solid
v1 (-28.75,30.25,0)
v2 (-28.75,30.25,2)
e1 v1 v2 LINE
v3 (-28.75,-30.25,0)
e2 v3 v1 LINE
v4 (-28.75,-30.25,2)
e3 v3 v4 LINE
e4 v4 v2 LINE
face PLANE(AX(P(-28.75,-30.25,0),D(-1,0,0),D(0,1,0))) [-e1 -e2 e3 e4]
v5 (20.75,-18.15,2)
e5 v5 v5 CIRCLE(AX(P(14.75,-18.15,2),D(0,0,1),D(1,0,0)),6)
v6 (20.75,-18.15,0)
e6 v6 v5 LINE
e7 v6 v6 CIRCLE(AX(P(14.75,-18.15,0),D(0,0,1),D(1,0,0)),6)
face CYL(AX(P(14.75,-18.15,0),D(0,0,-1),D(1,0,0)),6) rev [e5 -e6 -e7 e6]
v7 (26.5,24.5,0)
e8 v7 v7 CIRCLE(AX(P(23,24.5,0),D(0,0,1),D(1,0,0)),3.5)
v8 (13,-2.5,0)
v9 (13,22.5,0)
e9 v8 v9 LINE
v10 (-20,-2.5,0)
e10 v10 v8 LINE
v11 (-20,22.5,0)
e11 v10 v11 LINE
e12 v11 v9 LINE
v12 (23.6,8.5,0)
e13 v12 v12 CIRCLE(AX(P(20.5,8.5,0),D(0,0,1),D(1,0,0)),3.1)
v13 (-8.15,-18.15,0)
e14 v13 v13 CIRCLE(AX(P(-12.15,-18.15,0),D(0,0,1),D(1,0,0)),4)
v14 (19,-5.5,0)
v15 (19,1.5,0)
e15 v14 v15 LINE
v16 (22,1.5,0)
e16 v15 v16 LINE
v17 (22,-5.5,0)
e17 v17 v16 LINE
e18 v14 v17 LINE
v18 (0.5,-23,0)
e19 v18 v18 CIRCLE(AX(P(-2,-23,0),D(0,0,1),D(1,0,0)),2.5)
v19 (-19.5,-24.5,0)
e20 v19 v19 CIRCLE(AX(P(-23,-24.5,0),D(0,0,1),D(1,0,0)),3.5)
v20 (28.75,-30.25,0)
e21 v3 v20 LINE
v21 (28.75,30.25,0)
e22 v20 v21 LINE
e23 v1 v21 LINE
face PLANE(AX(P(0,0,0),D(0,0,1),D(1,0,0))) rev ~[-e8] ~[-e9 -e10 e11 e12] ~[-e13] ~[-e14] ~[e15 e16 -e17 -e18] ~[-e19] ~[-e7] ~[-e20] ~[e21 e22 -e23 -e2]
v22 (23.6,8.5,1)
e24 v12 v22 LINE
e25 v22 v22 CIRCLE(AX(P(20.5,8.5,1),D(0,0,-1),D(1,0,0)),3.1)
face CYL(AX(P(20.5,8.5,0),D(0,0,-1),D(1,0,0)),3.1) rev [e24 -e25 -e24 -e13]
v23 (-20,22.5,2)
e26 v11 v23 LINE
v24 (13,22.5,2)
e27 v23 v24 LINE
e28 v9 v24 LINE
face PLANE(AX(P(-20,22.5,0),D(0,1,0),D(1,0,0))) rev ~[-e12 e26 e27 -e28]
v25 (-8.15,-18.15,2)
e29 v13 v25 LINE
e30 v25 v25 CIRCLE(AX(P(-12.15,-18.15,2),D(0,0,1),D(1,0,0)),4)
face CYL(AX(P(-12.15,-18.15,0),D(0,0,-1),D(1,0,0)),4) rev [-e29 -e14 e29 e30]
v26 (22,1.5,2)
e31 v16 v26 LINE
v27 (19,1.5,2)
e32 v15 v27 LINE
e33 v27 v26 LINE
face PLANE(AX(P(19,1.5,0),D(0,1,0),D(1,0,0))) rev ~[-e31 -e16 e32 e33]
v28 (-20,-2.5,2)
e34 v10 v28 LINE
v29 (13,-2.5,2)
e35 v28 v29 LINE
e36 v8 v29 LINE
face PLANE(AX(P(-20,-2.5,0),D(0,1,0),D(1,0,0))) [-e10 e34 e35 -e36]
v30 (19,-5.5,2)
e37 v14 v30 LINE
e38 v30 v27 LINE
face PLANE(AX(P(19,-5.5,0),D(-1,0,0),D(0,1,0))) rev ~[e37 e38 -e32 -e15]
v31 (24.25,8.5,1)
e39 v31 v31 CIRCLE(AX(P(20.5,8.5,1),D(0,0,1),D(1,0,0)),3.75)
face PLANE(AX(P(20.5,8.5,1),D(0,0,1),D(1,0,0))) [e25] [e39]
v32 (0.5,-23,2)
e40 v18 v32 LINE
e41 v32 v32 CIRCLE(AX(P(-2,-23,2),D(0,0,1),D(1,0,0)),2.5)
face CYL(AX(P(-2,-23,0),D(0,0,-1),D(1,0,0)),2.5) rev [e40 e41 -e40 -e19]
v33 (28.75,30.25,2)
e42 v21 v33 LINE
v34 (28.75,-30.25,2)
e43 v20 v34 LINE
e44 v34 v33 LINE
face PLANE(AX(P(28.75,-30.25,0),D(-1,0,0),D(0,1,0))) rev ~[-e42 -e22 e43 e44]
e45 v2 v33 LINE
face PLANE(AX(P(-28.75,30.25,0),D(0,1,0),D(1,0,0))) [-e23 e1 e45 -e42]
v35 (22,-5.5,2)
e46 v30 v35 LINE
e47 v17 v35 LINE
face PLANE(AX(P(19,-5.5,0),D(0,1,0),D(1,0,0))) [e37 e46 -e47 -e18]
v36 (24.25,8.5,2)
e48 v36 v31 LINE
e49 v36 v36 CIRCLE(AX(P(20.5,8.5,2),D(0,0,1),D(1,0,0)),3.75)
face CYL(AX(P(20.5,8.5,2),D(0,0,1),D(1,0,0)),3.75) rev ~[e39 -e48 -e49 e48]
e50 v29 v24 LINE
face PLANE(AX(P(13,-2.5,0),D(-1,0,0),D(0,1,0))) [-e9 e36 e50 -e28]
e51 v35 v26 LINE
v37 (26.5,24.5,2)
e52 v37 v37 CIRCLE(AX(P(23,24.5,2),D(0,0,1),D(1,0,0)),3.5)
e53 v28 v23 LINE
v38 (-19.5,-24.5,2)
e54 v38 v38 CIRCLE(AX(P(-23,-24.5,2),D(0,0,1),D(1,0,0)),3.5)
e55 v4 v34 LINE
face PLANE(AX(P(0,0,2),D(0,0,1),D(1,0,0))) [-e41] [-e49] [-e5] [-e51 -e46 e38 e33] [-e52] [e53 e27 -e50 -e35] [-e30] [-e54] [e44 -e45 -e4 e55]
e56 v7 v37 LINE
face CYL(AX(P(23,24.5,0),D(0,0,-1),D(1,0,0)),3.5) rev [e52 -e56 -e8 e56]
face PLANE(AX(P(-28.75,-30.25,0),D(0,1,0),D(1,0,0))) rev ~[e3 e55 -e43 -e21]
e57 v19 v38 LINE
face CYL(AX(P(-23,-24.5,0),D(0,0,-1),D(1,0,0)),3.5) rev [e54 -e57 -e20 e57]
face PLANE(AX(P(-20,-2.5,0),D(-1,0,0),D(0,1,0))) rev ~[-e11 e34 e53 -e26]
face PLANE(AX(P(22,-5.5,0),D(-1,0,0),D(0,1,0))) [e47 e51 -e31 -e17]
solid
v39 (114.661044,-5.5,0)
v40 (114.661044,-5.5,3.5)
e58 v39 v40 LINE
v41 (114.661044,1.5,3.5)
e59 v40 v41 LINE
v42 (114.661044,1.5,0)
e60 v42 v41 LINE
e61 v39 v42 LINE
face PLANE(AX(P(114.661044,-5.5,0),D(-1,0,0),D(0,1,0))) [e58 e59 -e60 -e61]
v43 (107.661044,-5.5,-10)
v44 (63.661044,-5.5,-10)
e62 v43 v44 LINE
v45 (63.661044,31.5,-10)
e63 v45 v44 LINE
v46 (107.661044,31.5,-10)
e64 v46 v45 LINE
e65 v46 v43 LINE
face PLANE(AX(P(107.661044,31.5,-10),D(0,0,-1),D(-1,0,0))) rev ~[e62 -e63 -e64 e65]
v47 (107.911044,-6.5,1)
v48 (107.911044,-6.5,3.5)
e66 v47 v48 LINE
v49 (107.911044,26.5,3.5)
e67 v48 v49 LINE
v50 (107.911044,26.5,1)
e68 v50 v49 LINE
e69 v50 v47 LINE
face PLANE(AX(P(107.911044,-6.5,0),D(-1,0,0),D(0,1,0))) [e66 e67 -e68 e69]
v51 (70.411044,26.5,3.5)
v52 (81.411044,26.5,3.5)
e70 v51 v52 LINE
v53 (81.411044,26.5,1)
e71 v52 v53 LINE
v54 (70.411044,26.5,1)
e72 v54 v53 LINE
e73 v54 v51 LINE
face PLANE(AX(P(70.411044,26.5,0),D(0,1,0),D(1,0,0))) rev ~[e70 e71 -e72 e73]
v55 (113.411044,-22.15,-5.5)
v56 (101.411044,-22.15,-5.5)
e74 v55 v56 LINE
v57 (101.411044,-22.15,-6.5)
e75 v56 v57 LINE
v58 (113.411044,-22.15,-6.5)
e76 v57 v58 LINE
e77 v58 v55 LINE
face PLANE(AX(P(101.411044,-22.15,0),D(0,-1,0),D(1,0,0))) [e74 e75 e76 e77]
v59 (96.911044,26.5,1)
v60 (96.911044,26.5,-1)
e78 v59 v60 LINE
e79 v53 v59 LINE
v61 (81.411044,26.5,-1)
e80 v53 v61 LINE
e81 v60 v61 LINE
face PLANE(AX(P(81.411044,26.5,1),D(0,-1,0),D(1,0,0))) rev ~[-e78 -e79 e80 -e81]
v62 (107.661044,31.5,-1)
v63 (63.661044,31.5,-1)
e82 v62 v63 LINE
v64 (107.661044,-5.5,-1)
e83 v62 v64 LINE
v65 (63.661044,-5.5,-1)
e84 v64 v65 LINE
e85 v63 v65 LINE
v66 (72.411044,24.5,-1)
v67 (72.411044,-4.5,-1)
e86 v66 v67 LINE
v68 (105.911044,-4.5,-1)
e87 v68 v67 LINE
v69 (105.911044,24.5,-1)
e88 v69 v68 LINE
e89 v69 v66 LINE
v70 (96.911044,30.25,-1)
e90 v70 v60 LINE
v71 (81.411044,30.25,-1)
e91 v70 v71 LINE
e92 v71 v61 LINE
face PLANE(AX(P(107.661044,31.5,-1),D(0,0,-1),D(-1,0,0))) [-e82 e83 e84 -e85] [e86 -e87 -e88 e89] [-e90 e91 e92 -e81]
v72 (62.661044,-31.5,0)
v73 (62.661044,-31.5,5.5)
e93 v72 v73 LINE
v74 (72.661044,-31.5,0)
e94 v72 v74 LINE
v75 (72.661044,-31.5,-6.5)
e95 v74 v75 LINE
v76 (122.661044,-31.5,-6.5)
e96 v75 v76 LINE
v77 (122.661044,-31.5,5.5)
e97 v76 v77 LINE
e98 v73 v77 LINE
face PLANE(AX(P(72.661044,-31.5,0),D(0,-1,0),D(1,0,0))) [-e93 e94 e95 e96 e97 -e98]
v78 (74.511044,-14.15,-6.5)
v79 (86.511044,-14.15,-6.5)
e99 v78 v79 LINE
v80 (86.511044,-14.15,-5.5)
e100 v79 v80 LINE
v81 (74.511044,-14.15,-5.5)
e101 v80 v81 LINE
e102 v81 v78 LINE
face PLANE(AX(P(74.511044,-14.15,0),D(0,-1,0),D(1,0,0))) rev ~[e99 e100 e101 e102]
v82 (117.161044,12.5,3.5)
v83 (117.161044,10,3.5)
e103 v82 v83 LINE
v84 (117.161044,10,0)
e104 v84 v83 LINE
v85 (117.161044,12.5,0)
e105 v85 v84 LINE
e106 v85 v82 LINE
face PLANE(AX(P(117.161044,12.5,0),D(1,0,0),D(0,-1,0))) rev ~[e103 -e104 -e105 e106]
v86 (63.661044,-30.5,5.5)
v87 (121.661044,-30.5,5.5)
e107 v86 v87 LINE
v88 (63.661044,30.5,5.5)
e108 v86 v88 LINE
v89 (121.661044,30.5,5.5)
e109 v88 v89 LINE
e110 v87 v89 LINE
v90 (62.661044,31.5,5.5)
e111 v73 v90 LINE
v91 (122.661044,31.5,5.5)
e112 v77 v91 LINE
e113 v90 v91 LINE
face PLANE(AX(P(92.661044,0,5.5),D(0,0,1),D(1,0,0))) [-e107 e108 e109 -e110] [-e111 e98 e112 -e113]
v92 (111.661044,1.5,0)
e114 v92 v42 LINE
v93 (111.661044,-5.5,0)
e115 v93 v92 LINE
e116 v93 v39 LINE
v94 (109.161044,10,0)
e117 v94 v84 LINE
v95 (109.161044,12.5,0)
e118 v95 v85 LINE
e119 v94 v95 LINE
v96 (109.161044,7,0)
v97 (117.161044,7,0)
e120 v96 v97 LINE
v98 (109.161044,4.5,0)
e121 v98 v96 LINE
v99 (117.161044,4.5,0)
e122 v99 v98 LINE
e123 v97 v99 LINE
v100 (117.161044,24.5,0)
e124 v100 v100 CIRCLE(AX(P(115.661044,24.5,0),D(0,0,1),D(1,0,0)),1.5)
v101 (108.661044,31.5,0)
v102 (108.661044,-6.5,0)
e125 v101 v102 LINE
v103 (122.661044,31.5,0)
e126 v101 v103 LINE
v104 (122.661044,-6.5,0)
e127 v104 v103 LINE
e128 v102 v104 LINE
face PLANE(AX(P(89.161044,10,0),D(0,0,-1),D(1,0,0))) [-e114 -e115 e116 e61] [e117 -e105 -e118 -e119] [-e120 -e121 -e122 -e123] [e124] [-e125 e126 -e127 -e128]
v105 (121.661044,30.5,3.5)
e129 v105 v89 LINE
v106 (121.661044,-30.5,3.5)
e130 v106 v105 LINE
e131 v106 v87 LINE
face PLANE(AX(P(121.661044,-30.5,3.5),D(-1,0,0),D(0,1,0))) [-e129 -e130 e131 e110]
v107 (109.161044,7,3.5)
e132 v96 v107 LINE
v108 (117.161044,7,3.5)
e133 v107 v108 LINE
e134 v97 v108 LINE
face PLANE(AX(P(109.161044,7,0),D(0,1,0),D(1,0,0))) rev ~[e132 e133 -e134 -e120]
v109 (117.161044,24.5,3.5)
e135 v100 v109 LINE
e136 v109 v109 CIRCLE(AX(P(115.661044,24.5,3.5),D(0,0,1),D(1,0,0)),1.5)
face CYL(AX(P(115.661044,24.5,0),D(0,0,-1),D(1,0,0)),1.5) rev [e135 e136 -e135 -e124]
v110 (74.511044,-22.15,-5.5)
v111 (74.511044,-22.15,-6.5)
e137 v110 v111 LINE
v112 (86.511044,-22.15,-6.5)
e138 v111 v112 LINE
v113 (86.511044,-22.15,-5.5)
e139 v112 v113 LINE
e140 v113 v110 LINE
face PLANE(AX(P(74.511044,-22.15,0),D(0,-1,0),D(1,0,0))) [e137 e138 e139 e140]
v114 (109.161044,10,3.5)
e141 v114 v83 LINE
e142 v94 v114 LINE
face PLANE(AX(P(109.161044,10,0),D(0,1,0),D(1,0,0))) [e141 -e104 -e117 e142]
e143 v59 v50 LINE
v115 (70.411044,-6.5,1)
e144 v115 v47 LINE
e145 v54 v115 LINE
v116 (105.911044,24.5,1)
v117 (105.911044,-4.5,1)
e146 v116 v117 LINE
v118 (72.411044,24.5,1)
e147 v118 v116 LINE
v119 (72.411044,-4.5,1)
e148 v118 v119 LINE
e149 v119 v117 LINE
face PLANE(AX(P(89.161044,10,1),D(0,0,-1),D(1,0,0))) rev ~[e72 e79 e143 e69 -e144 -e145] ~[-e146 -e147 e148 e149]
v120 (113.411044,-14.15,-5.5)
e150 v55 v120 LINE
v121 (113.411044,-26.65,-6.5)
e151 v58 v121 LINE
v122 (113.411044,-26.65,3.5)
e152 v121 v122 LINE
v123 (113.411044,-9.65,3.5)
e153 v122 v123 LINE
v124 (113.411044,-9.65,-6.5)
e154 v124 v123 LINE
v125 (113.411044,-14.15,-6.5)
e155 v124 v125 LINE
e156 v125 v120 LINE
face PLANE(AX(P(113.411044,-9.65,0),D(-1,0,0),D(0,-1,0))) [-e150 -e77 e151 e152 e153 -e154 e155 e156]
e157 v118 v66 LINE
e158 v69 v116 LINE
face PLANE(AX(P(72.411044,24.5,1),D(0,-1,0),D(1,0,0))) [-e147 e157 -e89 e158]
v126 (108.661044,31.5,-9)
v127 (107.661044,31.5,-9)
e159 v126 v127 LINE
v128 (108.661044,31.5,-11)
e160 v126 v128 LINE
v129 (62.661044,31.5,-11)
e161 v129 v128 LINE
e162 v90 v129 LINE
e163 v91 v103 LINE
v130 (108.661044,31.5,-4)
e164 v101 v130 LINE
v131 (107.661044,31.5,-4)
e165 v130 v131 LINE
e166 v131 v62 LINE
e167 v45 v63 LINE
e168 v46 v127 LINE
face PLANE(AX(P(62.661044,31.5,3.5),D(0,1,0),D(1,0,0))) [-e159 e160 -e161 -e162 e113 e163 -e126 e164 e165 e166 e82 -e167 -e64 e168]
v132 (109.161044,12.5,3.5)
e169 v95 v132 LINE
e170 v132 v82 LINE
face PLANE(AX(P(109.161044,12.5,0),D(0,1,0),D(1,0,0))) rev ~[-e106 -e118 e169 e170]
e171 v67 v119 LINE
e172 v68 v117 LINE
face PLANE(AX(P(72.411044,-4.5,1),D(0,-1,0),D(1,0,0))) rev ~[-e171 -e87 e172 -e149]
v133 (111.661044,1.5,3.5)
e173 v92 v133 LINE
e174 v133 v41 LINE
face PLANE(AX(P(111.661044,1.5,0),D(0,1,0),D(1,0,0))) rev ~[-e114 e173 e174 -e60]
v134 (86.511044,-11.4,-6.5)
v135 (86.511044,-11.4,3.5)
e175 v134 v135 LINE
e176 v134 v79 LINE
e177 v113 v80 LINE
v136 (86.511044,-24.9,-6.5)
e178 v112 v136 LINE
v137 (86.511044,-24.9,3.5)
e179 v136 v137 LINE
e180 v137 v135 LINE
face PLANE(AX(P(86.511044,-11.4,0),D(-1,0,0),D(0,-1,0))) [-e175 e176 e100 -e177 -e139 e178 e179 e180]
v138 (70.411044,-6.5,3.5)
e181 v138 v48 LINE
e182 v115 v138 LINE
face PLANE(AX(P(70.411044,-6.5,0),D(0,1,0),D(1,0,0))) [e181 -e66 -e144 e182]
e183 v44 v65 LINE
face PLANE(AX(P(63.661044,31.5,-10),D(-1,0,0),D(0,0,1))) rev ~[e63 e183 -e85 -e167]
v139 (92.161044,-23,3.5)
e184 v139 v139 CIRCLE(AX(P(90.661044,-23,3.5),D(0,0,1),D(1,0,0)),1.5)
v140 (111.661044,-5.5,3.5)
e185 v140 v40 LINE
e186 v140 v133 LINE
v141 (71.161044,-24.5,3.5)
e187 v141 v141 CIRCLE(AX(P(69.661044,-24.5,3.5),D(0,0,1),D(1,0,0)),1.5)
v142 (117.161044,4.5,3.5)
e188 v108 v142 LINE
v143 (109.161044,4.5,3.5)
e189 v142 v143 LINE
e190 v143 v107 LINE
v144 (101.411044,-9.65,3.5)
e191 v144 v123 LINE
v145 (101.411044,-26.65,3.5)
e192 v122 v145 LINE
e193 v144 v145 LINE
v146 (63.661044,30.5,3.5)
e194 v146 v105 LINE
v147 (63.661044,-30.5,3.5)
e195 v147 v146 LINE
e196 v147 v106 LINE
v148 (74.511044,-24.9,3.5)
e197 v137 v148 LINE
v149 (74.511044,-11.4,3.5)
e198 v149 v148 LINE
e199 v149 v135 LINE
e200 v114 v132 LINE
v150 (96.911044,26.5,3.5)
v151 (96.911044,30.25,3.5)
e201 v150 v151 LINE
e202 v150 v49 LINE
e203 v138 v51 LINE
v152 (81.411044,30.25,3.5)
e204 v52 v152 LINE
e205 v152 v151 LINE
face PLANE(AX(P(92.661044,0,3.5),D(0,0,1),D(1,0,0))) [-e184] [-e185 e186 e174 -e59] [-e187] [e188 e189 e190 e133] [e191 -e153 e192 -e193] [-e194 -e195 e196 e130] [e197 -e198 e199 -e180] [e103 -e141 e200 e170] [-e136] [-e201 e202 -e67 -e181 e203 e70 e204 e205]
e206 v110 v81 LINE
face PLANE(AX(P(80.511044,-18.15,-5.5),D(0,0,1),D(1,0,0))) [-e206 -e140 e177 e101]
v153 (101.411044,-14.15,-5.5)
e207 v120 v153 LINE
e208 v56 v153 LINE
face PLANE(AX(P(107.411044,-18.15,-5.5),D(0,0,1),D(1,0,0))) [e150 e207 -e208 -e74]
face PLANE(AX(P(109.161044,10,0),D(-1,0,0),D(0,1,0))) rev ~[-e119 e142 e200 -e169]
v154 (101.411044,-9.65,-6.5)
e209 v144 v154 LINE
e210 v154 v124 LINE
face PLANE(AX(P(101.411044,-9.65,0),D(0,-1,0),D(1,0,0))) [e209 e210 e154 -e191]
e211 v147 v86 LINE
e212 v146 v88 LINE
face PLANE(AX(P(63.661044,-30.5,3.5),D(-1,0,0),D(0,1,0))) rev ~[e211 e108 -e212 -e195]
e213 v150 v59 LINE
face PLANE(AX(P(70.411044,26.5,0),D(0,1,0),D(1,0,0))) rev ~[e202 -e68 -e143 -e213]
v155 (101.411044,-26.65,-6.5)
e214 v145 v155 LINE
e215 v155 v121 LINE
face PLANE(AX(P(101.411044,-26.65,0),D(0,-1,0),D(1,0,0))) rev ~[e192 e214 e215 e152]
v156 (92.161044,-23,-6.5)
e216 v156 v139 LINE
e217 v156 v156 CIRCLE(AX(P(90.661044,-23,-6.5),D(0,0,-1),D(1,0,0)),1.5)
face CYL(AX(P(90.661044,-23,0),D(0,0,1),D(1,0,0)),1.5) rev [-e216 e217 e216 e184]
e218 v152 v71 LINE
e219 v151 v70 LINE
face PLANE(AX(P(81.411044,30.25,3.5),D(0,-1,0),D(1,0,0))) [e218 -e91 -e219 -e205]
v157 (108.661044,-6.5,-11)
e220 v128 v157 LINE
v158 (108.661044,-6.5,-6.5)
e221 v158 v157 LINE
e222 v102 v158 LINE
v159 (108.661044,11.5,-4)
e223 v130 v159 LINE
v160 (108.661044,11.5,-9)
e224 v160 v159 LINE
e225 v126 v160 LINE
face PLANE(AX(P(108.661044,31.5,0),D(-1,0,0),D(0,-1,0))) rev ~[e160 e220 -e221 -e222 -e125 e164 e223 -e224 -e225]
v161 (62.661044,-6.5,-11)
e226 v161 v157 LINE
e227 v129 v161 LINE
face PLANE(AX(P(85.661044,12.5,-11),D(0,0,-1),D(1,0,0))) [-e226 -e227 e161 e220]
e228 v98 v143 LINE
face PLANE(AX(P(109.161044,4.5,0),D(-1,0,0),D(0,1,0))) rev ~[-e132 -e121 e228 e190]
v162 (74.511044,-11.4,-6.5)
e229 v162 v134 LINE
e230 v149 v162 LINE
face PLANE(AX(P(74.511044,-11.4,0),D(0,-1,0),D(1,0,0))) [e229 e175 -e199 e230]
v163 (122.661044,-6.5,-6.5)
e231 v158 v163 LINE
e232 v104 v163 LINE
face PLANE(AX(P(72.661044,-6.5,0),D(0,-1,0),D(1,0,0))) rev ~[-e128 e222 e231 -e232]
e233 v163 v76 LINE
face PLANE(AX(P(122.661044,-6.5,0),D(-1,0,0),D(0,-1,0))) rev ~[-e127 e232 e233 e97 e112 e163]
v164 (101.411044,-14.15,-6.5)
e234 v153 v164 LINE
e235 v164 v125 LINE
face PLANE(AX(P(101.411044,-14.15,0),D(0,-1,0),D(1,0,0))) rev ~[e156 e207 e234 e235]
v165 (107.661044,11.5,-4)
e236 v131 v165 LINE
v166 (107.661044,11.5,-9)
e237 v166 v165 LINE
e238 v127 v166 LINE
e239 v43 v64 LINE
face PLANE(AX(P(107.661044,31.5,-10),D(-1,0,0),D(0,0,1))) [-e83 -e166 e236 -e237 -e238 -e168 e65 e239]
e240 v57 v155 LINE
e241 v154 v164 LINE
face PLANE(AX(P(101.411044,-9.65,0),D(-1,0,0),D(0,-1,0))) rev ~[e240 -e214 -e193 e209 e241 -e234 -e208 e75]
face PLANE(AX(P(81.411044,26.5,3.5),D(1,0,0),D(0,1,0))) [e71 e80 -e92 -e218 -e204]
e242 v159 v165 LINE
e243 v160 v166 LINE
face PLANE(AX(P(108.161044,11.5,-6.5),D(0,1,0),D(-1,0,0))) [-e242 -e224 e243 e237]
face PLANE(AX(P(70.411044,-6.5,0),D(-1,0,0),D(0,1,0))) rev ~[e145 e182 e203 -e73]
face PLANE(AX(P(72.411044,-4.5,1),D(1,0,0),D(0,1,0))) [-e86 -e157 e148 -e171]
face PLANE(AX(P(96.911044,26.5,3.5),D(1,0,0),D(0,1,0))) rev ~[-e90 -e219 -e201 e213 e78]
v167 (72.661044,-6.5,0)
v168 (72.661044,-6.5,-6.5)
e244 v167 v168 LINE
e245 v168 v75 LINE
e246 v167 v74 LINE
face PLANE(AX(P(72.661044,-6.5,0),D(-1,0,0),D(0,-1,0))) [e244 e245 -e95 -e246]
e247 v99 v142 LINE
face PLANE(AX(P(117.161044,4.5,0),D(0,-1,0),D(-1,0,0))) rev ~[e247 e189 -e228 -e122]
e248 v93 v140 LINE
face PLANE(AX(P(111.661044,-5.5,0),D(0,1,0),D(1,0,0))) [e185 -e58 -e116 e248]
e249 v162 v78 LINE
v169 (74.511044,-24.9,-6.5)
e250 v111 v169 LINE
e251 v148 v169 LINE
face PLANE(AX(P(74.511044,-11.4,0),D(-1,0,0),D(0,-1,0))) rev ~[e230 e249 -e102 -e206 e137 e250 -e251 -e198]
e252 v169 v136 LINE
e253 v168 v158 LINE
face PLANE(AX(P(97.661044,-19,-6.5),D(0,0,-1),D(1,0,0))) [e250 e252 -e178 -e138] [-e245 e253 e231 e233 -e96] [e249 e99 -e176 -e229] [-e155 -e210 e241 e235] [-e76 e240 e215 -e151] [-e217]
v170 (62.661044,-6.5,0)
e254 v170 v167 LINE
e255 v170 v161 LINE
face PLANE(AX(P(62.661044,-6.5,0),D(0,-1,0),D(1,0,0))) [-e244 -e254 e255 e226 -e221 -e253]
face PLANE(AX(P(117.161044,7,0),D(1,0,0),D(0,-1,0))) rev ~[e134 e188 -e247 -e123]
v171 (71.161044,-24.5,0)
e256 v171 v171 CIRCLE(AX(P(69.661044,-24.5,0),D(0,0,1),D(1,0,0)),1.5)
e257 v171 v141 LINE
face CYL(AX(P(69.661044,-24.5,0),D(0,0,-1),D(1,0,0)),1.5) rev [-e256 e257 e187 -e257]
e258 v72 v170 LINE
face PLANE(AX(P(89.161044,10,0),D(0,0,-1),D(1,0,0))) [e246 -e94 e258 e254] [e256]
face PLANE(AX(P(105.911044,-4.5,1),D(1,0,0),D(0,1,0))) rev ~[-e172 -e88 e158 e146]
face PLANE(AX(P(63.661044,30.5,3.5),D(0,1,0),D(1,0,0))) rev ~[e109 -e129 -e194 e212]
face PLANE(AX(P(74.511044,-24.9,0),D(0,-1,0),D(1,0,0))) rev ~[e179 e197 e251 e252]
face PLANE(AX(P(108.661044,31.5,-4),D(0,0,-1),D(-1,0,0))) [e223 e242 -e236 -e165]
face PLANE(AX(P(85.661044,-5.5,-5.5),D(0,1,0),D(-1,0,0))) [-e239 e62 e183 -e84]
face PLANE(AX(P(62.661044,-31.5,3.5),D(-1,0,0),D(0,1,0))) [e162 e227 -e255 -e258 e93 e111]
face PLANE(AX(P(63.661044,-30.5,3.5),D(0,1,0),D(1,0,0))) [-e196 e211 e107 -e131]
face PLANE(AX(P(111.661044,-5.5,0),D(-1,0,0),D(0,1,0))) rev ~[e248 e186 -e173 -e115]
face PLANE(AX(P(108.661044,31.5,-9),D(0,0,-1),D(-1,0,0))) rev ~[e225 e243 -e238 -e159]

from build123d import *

# Parameters (mm, degrees)
F1_W      = 60
F1_H      = 63
F1_R      = 1.5
F1_W_2    = 3
F1_H_2    = 7
F1_W_3    = 37.5
F1_H_3    = 33
F1_W_4    = 12
F1_H_4    = 8
F1_W_5    = 8
F1_H_5    = 3
F2_DEPTH  = 3.5
F4_W      = 37.5
F4_H      = 33
F4_W_2    = 33.5
F4_H_2    = 29
F5_DEPTH  = 1
F3_W      = 15.5
F3_H      = 3.75
F6_DEPTH  = 2.5
F0_W      = 57.5
F0_H      = 60.5
F0_R      = 3.5
F0_R_2    = 2.5
F0_R_3    = 4
F0_R_4    = 6
F0_W_2    = 3
F0_H_2    = 7
F0_W_3    = 33
F0_H_3    = 25
F0_R_5    = 3.1
F8_DEPTH  = 2
F10_W     = 46
F10_H     = 38
F11_DEPTH = 11
F12_W     = 44
F12_H     = 9
F13_DEPTH = 37
F14_W     = 1
F14_H     = 5
F15_DEPTH = 20
F16_W     = 33.5
F16_H     = 29
F16_W_2   = 15.5
F16_H_2   = 3.75
F17_DEPTH = 4
F18_W     = 60
F18_H     = 63
F18_W_2   = 58
F18_H_2   = 61
F19_DEPTH = 2
F20_W     = 50
F20_H     = 25
F20_W_2   = 12
F20_H_2   = 2.75
F20_H_3   = 4.5
F20_R     = 1.5
F21_DEPTH = 6.5
F22_W     = 12
F22_H     = 13.5
F22_H_2   = 17
F23_DEPTH = 9
F26_R     = 3.75
F27_DEPTH = 1


# Not quite as in the source:
# - a feature names something its author has since deleted; it is built from what else it names


with BuildPart() as f2:
    # F1 (on Top) → F2 (new body)
    with BuildSketch(Plane.XY):
        with Locations((92.6610440163, 0)):
            Rectangle(F1_W, F1_H)
        with Locations((69.6610440163, -24.5)):
            Circle(F1_R, mode=Mode.SUBTRACT)
        Polygon((86.5110440163, -22.15), (86.5110440163, -24.9), (74.5110440163, -24.9), (74.5110440163, -22.15), (74.5110440163, -14.15), (74.5110440163, -11.4), (86.5110440163, -11.4), (86.5110440163, -14.15), align=None, mode=Mode.SUBTRACT)
        with Locations((90.6610440163, -23)):
            Circle(F1_R, mode=Mode.SUBTRACT)
        Polygon((113.4110440163, -22.15), (113.4110440163, -26.65), (101.4110440163, -26.65), (101.4110440163, -22.15), (101.4110440163, -14.15), (101.4110440163, -9.65), (113.4110440163, -9.65), (113.4110440163, -14.15), align=None, mode=Mode.SUBTRACT)
        with Locations((113.1610440163, -2)):
            Rectangle(F1_W_2, F1_H_2, mode=Mode.SUBTRACT)
        with Locations((89.1610440163, 10)):
            Rectangle(F1_W_3, F1_H_3, mode=Mode.SUBTRACT)
        Polygon((117.1610440163, 7), (117.1610440163, 4.5), (109.1610440163, 4.5), (109.1610440163, 7), (109.1610440163, 10), (109.1610440163, 12.5), (117.1610440163, 12.5), (117.1610440163, 10), align=None, mode=Mode.SUBTRACT)
        with Locations((115.6610440163, 24.5)):
            Circle(F1_R, mode=Mode.SUBTRACT)
        with Locations((80.5110440163, -18.15)):
            Rectangle(F1_W_4, F1_H_4)
        with Locations((107.4110440163, -18.15)):
            Rectangle(F1_W_4, F1_H_4)
        with Locations((113.1610440163, 8.5)):
            Rectangle(F1_W_5, F1_H_5)
    extrude(amount=F2_DEPTH)

    # F4 (on face) → F5 (join)
    with BuildSketch(Plane(origin=(0, 0, 0), x_dir=(1, 0, 0), z_dir=(0, 0, -1))):
        with Locations((89.1610440163, -10)):
            Rectangle(F4_W, F4_H)
        with Locations((89.1610440163, -10)):
            Rectangle(F4_W_2, F4_H_2, mode=Mode.SUBTRACT)
    extrude(amount=-F5_DEPTH)

    # F3 (on face) → F6 (cut)
    with BuildSketch(Plane.XY.offset(3.5)):
        with Locations((89.1610440163, 28.375)):
            Rectangle(F3_W, F3_H)
    extrude(amount=-F6_DEPTH, mode=Mode.SUBTRACT)

    # F10 (on face) → F11 (join)
    with BuildSketch(Plane(origin=(0, 0, 0), x_dir=(1, 0, 0), z_dir=(0, 0, -1))):
        with Locations((85.6610440163, -12.5)):
            Rectangle(F10_W, F10_H)
    extrude(amount=F11_DEPTH)

    # F12 (on face) → F13 (cut)
    with BuildSketch(Plane(origin=(0, 31.5, 0), x_dir=(-1, 0, 0), z_dir=(0, 1, 0))):
        with Locations((-85.6610440163, -5.5)):
            Rectangle(F12_W, F12_H)
    extrude(amount=-F13_DEPTH, mode=Mode.SUBTRACT)

    # F14 (on face) → F15 (cut)
    with BuildSketch(Plane(origin=(0, 31.5, 0), x_dir=(-1, 0, 0), z_dir=(0, 1, 0))):
        with Locations((-108.1610440163, -6.5)):
            Rectangle(F14_W, F14_H)
    extrude(amount=-F15_DEPTH, mode=Mode.SUBTRACT)

    # F16 (on face) → F17 (cut)
    with BuildSketch(Plane.XY.offset(1)):
        with Locations((89.1610440163, 10)):
            Rectangle(F16_W, F16_H)
        with Locations((89.1610440163, 28.375)):
            Rectangle(F16_W_2, F16_H_2)
    extrude(amount=-F17_DEPTH, mode=Mode.SUBTRACT)

    # F18 (on face) → F19 (join)
    with BuildSketch(Plane.XY.offset(3.5)):
        with Locations((92.6610440163, 0)):
            Rectangle(F18_W, F18_H)
        with Locations((92.6610440163, 0)):
            Rectangle(F18_W_2, F18_H_2, mode=Mode.SUBTRACT)
    extrude(amount=F19_DEPTH)

    # F20 (on face) → F21 (join)
    with BuildSketch(Plane(origin=(0, 0, 0), x_dir=(1, 0, 0), z_dir=(0, 0, -1))):
        with Locations((97.6610440163, 19)):
            Rectangle(F20_W, F20_H)
        with Locations((80.5110440163, 12.775)):
            Rectangle(F20_W_2, F20_H_2, mode=Mode.SUBTRACT)
        with Locations((107.4110440163, 11.9)):
            Rectangle(F20_W_2, F20_H_3, mode=Mode.SUBTRACT)
        with Locations((80.5110440163, 23.525)):
            Rectangle(F20_W_2, F20_H_2, mode=Mode.SUBTRACT)
        with Locations((90.6610440163, 23)):
            Circle(F20_R, mode=Mode.SUBTRACT)
        with Locations((107.4110440163, 24.4)):
            Rectangle(F20_W_2, F20_H_3, mode=Mode.SUBTRACT)
    extrude(amount=F21_DEPTH)

    # F22 (on face) → F23 (cut)
    with BuildSketch(Plane.XY.offset(3.5)):
        with Locations((80.5110440163, -18.15)):
            Rectangle(F22_W, F22_H)
        with Locations((107.4110440163, -18.15)):
            Rectangle(F22_W, F22_H_2)
    extrude(amount=-F23_DEPTH, mode=Mode.SUBTRACT)


with BuildPart() as f8:
    # F0 (on Top) → F8 (new body)
    with BuildSketch(Plane.XY):
        Rectangle(F0_W, F0_H)
        with Locations((-23, -24.5)):
            Circle(F0_R, mode=Mode.SUBTRACT)
        with Locations((-2, -23)):
            Circle(F0_R_2, mode=Mode.SUBTRACT)
        with Locations((-12.15, -18.15)):
            Circle(F0_R_3, mode=Mode.SUBTRACT)
        with Locations((14.75, -18.15)):
            Circle(F0_R_4, mode=Mode.SUBTRACT)
        with Locations((20.5, -2)):
            Rectangle(F0_W_2, F0_H_2, mode=Mode.SUBTRACT)
        with Locations((-3.5, 10)):
            Rectangle(F0_W_3, F0_H_3, mode=Mode.SUBTRACT)
        with Locations((20.5, 8.5)):
            Circle(F0_R_5, mode=Mode.SUBTRACT)
        with Locations((23, 24.5)):
            Circle(F0_R, mode=Mode.SUBTRACT)
    extrude(amount=F8_DEPTH)

    # F26 (on face) → F27 (cut)
    with BuildSketch(Plane.XY.offset(2)):
        with Locations((20.5, 8.5)):
            Circle(F26_R)
    extrude(amount=-F27_DEPTH, mode=Mode.SUBTRACT)


solid = Compound([f2.part, f8.part])
